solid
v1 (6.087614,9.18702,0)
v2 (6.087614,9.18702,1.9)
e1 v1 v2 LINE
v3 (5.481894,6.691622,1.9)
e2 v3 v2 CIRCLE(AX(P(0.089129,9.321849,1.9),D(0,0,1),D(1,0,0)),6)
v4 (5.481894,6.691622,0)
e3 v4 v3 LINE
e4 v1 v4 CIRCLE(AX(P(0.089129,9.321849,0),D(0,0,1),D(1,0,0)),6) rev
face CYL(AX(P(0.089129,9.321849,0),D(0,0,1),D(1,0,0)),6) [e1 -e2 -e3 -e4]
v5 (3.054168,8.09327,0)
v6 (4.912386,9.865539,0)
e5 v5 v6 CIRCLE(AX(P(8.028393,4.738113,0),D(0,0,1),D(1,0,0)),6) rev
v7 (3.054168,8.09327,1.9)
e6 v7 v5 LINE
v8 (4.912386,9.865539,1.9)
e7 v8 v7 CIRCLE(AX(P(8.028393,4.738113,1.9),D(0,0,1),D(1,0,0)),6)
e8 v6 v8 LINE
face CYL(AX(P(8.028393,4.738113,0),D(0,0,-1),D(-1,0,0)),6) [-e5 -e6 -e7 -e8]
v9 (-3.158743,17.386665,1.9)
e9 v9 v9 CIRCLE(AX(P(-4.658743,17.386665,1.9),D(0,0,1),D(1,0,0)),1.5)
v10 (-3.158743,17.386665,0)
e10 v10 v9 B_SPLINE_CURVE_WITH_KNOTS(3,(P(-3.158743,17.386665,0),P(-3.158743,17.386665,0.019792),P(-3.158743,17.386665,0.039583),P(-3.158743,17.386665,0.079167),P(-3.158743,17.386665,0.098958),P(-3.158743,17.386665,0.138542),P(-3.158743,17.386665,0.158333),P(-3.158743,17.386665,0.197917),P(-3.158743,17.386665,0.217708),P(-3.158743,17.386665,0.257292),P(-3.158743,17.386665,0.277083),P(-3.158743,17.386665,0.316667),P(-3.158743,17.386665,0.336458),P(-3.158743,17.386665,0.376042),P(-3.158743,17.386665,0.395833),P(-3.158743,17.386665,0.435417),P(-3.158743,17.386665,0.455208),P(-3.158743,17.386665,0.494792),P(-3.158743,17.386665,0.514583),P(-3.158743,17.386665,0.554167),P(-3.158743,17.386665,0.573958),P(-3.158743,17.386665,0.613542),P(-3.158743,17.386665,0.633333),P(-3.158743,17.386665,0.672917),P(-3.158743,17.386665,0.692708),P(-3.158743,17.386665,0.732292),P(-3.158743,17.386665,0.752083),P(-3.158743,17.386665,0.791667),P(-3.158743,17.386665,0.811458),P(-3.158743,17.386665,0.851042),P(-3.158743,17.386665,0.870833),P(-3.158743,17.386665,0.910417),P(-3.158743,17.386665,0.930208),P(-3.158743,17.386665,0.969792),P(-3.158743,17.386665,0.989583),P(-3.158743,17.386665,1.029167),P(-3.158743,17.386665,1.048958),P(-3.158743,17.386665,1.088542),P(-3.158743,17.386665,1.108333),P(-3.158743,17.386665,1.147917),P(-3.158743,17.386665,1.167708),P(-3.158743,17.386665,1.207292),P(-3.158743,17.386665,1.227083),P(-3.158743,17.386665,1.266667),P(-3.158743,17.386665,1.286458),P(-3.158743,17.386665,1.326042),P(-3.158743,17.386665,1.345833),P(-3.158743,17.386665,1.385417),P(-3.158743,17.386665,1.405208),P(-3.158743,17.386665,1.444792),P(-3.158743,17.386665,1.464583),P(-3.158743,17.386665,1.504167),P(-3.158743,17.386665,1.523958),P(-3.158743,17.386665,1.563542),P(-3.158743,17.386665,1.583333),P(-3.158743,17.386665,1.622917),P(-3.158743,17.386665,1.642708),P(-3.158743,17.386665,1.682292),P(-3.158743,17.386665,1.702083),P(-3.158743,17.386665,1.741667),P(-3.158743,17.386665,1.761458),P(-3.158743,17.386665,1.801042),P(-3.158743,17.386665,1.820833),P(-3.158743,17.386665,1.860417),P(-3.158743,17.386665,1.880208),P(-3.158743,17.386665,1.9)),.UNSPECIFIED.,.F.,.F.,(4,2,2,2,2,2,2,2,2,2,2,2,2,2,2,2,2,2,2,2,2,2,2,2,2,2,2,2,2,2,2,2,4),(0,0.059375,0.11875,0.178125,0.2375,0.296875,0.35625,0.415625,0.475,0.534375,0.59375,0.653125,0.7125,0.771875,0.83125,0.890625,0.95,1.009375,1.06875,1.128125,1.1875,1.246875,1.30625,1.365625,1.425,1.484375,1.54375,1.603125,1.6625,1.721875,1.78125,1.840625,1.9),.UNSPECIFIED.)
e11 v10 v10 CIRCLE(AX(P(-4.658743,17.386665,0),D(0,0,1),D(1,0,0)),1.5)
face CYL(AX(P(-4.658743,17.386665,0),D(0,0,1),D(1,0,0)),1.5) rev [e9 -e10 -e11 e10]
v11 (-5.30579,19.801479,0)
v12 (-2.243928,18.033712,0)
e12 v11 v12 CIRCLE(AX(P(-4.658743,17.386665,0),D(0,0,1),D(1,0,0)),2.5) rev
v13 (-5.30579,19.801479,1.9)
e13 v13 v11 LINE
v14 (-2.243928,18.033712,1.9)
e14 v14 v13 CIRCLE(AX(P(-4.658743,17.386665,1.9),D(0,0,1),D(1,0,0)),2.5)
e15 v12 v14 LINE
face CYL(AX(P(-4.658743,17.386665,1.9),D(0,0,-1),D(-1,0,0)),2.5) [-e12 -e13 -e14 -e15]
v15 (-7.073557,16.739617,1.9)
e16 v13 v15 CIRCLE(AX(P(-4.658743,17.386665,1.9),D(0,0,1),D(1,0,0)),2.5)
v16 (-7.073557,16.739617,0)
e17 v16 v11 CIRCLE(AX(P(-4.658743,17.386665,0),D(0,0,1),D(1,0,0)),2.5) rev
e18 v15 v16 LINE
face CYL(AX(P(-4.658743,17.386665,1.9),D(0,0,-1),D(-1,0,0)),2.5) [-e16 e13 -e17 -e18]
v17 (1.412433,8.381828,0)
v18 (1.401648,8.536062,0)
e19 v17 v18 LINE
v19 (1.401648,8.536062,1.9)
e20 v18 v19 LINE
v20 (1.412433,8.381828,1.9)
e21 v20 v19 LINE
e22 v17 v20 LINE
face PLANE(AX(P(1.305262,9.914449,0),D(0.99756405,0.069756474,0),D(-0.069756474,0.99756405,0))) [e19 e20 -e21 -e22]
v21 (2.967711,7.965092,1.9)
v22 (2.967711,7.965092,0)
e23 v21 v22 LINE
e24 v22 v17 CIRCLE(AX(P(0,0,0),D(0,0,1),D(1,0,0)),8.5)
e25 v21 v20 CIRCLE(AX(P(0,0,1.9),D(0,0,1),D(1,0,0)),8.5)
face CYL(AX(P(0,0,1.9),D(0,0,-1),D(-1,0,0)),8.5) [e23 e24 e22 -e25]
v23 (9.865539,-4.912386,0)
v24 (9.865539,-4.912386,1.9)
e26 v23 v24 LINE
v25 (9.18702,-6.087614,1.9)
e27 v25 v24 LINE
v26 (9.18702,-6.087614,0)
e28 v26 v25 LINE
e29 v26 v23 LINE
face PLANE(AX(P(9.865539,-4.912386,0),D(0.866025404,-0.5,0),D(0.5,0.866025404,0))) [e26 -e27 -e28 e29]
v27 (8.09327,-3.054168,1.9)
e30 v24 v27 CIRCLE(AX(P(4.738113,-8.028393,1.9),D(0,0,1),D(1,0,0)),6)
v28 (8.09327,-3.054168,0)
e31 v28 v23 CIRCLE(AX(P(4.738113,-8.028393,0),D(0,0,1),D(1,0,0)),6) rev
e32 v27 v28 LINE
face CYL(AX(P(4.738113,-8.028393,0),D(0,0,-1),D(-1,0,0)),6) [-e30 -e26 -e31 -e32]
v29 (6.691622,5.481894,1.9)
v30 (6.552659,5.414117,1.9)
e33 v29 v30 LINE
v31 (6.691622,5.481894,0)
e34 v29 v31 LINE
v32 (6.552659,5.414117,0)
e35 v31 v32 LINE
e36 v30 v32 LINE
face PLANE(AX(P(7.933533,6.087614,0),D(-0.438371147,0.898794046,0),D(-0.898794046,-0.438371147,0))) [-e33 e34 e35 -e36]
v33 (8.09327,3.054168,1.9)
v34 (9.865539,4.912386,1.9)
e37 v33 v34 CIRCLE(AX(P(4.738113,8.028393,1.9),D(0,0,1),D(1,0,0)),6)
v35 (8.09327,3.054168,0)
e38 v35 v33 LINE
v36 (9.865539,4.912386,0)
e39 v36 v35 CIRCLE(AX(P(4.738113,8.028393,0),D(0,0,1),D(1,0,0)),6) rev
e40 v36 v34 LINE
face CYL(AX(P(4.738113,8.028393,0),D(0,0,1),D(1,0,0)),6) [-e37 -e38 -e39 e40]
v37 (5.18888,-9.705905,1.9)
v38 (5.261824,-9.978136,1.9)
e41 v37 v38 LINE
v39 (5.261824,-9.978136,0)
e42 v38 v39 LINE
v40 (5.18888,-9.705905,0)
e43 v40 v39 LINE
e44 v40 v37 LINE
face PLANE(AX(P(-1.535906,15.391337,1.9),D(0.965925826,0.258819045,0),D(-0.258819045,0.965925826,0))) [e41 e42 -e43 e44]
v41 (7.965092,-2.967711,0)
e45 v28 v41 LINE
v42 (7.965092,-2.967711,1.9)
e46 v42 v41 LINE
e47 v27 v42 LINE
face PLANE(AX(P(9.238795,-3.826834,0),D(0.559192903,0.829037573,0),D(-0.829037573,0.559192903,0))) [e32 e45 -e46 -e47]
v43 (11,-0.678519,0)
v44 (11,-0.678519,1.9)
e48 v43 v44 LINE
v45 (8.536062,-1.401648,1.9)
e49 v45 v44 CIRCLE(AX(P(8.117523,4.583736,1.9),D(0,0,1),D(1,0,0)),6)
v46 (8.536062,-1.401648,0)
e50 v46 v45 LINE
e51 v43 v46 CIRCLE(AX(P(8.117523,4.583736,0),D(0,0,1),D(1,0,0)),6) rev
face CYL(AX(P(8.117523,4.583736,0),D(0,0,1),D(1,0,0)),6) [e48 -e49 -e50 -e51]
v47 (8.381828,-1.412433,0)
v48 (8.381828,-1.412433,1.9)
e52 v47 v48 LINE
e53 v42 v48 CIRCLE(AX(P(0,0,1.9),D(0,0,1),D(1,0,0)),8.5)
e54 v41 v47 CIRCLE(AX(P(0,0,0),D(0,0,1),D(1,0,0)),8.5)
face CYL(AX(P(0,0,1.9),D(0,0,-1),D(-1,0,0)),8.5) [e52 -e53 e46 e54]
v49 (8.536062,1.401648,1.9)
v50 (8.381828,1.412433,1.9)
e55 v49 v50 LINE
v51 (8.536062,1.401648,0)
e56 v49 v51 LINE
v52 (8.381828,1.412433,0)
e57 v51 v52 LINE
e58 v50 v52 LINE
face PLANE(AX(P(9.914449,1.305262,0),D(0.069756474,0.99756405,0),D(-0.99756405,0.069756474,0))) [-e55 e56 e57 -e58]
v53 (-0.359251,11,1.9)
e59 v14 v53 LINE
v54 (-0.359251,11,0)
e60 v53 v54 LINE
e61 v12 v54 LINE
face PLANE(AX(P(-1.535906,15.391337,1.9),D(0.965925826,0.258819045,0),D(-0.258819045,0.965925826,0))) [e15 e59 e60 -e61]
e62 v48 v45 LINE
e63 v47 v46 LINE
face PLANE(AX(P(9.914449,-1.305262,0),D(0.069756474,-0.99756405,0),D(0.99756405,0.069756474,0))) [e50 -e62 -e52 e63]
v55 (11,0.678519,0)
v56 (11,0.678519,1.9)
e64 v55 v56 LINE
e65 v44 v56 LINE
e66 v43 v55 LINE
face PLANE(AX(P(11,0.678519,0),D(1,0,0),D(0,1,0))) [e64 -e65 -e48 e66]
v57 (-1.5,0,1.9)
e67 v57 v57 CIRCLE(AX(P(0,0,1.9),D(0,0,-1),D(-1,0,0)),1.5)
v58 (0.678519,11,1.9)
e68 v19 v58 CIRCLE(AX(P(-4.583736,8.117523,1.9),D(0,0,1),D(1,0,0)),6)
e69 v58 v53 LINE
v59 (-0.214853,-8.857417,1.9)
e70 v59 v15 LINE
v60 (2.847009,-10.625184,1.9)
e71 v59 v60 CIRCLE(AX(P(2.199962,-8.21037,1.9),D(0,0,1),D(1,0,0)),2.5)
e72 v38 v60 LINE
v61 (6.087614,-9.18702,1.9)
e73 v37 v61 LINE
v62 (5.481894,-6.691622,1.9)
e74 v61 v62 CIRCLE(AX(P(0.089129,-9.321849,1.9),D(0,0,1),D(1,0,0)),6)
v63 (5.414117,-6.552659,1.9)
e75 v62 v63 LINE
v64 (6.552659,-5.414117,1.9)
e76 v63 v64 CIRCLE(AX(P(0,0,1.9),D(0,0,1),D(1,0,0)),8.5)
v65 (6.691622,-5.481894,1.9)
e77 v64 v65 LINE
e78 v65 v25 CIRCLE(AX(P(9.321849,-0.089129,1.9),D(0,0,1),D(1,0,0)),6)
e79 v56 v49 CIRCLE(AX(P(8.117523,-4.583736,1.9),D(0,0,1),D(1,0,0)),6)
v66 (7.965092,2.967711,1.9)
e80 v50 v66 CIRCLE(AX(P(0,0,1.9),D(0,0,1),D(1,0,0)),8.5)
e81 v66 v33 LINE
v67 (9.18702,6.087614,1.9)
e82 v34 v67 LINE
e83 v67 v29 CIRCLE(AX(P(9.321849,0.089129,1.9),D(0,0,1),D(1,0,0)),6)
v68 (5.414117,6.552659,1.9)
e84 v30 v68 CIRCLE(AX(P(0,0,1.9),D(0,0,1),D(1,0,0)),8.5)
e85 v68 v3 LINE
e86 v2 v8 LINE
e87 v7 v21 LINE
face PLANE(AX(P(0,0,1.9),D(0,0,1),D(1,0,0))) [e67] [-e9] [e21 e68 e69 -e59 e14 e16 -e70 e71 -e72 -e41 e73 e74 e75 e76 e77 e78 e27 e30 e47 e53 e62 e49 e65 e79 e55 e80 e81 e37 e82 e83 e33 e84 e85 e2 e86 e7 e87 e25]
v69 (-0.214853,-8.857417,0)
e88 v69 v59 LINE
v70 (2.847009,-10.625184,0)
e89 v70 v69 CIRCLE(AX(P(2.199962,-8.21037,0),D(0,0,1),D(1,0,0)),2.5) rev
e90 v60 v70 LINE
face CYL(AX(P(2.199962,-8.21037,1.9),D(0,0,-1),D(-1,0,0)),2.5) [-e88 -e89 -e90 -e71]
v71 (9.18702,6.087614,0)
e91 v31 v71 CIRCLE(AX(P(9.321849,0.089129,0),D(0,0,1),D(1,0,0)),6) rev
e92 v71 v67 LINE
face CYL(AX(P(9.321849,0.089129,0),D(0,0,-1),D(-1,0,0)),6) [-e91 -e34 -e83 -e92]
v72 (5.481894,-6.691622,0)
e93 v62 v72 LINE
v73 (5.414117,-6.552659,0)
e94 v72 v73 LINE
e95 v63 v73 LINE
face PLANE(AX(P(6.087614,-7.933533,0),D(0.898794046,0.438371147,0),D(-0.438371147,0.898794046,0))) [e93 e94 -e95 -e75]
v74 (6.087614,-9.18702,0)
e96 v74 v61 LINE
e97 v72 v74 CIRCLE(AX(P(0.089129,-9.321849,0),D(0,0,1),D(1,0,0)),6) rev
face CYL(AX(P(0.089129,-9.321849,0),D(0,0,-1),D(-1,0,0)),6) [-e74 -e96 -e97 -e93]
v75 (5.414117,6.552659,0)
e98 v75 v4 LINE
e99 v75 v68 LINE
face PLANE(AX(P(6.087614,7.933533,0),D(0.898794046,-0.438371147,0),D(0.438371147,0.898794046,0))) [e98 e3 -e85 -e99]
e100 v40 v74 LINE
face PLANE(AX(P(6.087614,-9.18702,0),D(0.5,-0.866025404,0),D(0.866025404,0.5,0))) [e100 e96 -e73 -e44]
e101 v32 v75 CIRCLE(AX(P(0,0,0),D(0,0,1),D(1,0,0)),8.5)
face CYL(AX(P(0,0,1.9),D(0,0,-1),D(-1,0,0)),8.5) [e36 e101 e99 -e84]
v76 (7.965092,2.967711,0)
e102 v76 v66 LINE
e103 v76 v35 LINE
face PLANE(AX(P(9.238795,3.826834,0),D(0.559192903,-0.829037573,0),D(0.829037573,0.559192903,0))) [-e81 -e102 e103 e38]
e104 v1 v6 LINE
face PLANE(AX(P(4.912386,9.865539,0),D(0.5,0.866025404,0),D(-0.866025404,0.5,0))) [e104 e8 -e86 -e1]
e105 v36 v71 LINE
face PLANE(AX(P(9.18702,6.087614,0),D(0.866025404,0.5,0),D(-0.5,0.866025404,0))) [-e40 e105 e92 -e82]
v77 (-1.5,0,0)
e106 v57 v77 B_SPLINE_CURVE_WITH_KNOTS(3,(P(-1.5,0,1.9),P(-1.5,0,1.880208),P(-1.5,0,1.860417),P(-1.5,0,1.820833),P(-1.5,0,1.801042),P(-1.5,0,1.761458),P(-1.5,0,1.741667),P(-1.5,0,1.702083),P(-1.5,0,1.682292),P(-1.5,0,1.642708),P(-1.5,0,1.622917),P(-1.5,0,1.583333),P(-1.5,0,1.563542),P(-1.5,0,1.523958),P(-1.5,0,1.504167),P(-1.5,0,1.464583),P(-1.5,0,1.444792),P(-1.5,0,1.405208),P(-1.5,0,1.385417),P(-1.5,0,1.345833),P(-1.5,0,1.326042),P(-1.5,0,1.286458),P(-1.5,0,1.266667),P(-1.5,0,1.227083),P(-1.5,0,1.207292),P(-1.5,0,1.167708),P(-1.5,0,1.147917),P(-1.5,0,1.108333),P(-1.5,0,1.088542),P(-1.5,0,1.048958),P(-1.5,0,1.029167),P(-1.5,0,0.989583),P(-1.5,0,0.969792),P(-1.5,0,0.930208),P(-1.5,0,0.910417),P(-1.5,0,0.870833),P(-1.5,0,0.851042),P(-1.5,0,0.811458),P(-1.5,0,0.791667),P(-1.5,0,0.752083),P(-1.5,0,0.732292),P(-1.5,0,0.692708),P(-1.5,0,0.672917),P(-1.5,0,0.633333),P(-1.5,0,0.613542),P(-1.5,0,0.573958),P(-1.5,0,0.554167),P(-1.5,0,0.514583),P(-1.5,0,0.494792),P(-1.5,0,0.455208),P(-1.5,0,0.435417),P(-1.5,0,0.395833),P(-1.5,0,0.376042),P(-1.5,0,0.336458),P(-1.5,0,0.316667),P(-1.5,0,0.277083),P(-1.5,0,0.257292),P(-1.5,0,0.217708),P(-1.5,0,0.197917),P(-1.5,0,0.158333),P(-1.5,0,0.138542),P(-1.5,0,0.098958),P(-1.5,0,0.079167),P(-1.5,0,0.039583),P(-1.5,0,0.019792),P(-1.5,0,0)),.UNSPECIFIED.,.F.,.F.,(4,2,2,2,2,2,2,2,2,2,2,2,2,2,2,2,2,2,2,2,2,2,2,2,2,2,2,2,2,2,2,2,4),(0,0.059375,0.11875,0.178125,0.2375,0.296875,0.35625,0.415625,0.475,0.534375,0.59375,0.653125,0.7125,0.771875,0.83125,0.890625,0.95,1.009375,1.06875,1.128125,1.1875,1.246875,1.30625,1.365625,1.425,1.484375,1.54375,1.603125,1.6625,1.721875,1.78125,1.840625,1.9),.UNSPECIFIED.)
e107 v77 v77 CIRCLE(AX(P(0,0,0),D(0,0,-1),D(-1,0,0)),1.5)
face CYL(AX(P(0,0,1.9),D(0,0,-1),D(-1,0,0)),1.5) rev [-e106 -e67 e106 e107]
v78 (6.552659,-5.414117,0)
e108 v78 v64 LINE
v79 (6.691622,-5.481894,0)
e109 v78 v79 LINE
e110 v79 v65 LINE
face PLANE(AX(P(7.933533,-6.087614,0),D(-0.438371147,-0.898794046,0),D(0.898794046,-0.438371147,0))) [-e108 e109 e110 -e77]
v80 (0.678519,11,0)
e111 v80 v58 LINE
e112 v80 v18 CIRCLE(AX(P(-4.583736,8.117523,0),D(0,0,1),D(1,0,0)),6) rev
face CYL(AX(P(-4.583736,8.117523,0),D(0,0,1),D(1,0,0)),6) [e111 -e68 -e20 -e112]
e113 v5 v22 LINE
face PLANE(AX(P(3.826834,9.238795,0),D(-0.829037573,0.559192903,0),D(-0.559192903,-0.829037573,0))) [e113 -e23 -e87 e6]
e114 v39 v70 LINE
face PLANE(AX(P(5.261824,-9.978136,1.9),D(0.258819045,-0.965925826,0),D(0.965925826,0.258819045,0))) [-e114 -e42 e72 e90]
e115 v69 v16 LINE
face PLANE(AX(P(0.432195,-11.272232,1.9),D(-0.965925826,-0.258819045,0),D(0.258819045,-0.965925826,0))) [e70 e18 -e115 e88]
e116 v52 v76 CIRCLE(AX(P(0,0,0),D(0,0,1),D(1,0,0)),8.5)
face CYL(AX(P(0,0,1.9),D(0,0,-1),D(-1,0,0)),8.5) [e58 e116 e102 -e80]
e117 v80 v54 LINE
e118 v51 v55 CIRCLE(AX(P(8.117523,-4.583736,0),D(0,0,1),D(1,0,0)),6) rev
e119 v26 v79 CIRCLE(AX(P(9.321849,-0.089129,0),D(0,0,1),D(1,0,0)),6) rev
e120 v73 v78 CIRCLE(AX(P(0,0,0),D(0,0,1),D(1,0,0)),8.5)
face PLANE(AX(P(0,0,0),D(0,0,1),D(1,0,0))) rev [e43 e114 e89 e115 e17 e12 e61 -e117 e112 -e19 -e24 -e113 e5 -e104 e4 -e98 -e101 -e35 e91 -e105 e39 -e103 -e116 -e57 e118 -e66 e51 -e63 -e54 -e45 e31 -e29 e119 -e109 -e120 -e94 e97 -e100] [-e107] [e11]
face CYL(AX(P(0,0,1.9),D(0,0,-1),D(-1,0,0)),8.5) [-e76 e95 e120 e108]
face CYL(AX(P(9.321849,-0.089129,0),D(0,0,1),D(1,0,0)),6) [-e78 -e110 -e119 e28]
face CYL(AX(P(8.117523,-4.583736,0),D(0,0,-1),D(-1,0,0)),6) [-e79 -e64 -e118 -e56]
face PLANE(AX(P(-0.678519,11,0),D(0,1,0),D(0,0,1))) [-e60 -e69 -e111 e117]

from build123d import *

# Parameters (mm, degrees)
SKETCH1_R           = 8.5
BOSS_EXTRUDE1_DEPTH = 1.9
BOSS_EXTRUDE2_DEPTH = 1.9
CIRPATTERN2_COUNT   = 12
FILLET5_R           = 6
FILLET6_R           = 6
BOSS_EXTRUDE5_DEPTH = 1.9
SKETCH15_R          = 5
BOSS_EXTRUDE6_DEPTH = 1.9
SKETCH14_R          = 1.5
CUT_EXTRUDE7_DEPTH  = 24.297043988
CUT_EXTRUDE8_DEPTH  = 24.297043988
SKETCH17_R          = 1.5
CUT_EXTRUDE9_DEPTH  = 24.297043988
FILLET7_R           = 2.5


# Some blends are built 0.0001 mm under size
with BuildPart() as part:
    # Sketch1 → Boss-Extrude1 (new body)
    with BuildSketch(Plane.XY):
        with Locations(Location((0, 0, 0), (0, 0, 180))):
            Circle(SKETCH1_R)
    extrude(amount=BOSS_EXTRUDE1_DEPTH)

    # Sketch3 → Boss-Extrude2 (add)
    with BuildSketch(Plane.XY.offset(1.9)):
        Polygon((-1.305261922, 9.914448614), (-1.509060022, 7), (1.509060022, 7), (1.305261922, 9.914448614), (0.678518537, 11), (-0.678518537, 11), align=None)
    boss_extrude2 = extrude(amount=-BOSS_EXTRUDE2_DEPTH)

    # CirPattern2: Boss-Extrude2 ×12 about axis
    cirpattern2_axis = Axis((0, 0, 0), (0, 0, 1))
    for i in range(1, CIRPATTERN2_COUNT):
        add(boss_extrude2.rotate(cirpattern2_axis, i * 360 / CIRPATTERN2_COUNT))

    # Fillet5
    # the kernel refuses this fillet: 6 mm, written as the material it takes off along each edge
    with BuildSketch(Plane(origin=(9.238795325, 3.826834324, 5.354382408), x_dir=(0.49999999999981276, 0.8660254037845467, 0), z_dir=(0, 0, -1)), Plane(origin=(1.305261922, 9.914448614, 5.354382408), x_dir=(-0.5000000000001841, 0.8660254037843323, 0), z_dir=(0, 0, -1)), Plane(origin=(-7.933533403, 6.08761429, 5.354382408), x_dir=(-1, 0, 0), z_dir=(0, 0, -1)), Plane(origin=(-9.914448614, 1.305261922, 5.354382408), x_dir=(-0.8660254037843321, -0.5000000000001844, 0), z_dir=(0, 0, -1)), Plane(origin=(-9.238795325, -3.826834324, 5.354382408), x_dir=(-0.49999999999981826, -0.8660254037845436, 0), z_dir=(0, 0, -1)), Plane(origin=(-6.08761429, -7.933533403, 5.354382408), x_dir=(0, -1, 0), z_dir=(0, 0, -1)), Plane(origin=(3.826834324, -9.238795325, 5.354382408), x_dir=(0.8660254037845474, -0.49999999999981154, 0), z_dir=(0, 0, -1)), Plane(origin=(7.933533403, -6.08761429, 5.354382408), x_dir=(1, 0, 0), z_dir=(0, 0, -1)), Plane(origin=(9.914448614, -1.305261922, 5.354382408), x_dir=(0.866025403784333, 0.500000000000183, 0), z_dir=(0, 0, -1))) as fillet5_piece_1:
        with BuildLine():
            CenterArc((1.388315544, -5.998484909), FILLET5_R, 91.287628333, 24.712371667)
            Line((-1.241911337, -0.605720631), (-1.294515874, -0.497865346))
            Line((-1.294515874, -0.497865346), (-0.052604538, 0.107855286))
            Line((-0.052604538, 0.107855286), (0, 0.12))
            ThreePointArc((0, 0.12), (0.626743385, 0.12), (1.250790195, 0.119969698))
            Line((1.250790195, 0.119969698), (1.25348677, 0))
        make_face()
    extrude(amount=8.808764816, mode=Mode.SUBTRACT)
    with BuildSketch(Plane(origin=(6.08761429, 7.933533403, 5.354382408), x_dir=(-0.4383711467890806, -0.8987940462991654, 0), z_dir=(0, 0, -1)), Plane(origin=(-3.826834324, 9.238795325, 5.354382408), x_dir=(0.5591929034707432, -0.8290375725550441, 0), z_dir=(0, 0, -1)), Plane(origin=(-1.305261922, -9.914448614, 5.354382408), x_dir=(-0.06975647374412203, 0.9975640502598244, 0), z_dir=(0, 0, -1))) as fillet5_piece_2:
        with BuildLine():
            CenterArc((1.381752963, 6), FILLET5_R, 245.287628333, 24.712371667)
            Line((-1.126626446, 0.549492433), (-1.176794034, 0.440482282))
            ThreePointArc((-1.176794034, 0.440482282), (-0.615917761, 0.166890931), (-0.052604538, -0.107855286))
            Line((-0.052604538, -0.107855286), (0, -0.12))
            Line((0, -0.12), (1.381752963, -0.12))
            Line((1.381752963, -0.12), (1.381752963, 0))
        make_face()
    extrude(amount=8.808764816, mode=Mode.SUBTRACT)

    # Fillet6
    # the kernel refuses this fillet: 6 mm, written as the material it takes off along each edge
    with BuildSketch(Plane(origin=(7.933533403, 6.08761429, 5.354382408), x_dir=(-0.8987940462991681, -0.4383711467890751, 0), z_dir=(0, 0, -1)), Plane(origin=(3.826834324, 9.238795325, 5.354382408), x_dir=(-0.5591929034707512, -0.8290375725550386, 0), z_dir=(0, 0, -1)), Plane(origin=(-1.305261922, 9.914448614, 5.354382408), x_dir=(-0.06975647374412959, -0.9975640502598239, 0), z_dir=(0, 0, -1)), Plane(origin=(-6.08761429, 7.933533403, 5.354382408), x_dir=(0.43837114678907496, -0.8987940462991681, 0), z_dir=(0, 0, -1)), Plane(origin=(-9.238795325, 3.826834324, 5.354382408), x_dir=(0.8290375725550395, -0.5591929034707501, 0), z_dir=(0, 0, -1)), Plane(origin=(-9.914448614, -1.305261922, 5.354382408), x_dir=(0.9975640502598241, -0.0697564737441288, 0), z_dir=(0, 0, -1)), Plane(origin=(-7.933533403, -6.08761429, 5.354382408), x_dir=(0.8987940462991686, 0.4383711467890744, 0), z_dir=(0, 0, -1)), Plane(origin=(-3.826834324, -9.238795325, 5.354382408), x_dir=(0.5591929034707488, 0.8290375725550403, 0), z_dir=(0, 0, -1)), Plane(origin=(1.305261922, -9.914448614, 5.354382408), x_dir=(0.06975647374412966, 0.9975640502598239, 0), z_dir=(0, 0, -1)), Plane(origin=(6.08761429, -7.933533403, 5.354382408), x_dir=(-0.4383711467890749, 0.8987940462991683, 0), z_dir=(0, 0, -1)), Plane(origin=(9.238795325, -3.826834324, 5.354382408), x_dir=(-0.8290375725550393, 0.5591929034707505, 0), z_dir=(0, 0, -1)), Plane(origin=(9.914448614, 1.305261922, 5.354382408), x_dir=(-0.9975640502598239, 0.06975647374412894, 0), z_dir=(0, 0, -1))) as fillet6_piece_1:
        with BuildLine():
            CenterArc((1.381752963, -6), FILLET6_R, 90, 24.712371667)
            Line((-1.126626446, -0.549492433), (-1.176794034, -0.440482282))
            ThreePointArc((-1.176794034, -0.440482282), (-0.615917761, -0.166890931), (-0.052604538, 0.107855286))
            Line((-0.052604538, 0.107855286), (0, 0.12))
            Line((0, 0.12), (1.381752963, 0.12))
            Line((1.381752963, 0.12), (1.381752963, 0))
        make_face()
    extrude(amount=8.808764816, mode=Mode.SUBTRACT)

    # Sketch12 → Boss-Extrude5 (add)
    with BuildSketch(Plane(origin=(0, 0, 0), x_dir=(-1, 0, 0), z_dir=(0, 0, -1))):
        Polygon((1.535905814, 15.391336798), (-5.261824062, -9.978136476), (-0.43219493, -11.272231702), (7.72060499, 19.154431826), (2.890975859, 20.448527052), align=None)
    extrude(amount=-BOSS_EXTRUDE5_DEPTH)

    # Sketch15 → Boss-Extrude6 (add)
    with BuildSketch(Plane(origin=(0, 0, 0), x_dir=(-1, 0, 0), z_dir=(0, 0, -1))):
        Circle(SKETCH15_R)
    extrude(amount=-BOSS_EXTRUDE6_DEPTH)

    # Sketch14 → Cut-Extrude7 (cut, through all)
    with BuildSketch(Plane(origin=(0, 0, 0), x_dir=(-1, 0, 0), z_dir=(0, 0, -1))):
        Circle(SKETCH14_R)
    extrude(amount=-CUT_EXTRUDE7_DEPTH, mode=Mode.SUBTRACT)

    # Sketch16 → Cut-Extrude8 (cut, through all)
    with BuildSketch(Plane.XY.offset(1.9)):
        Polygon((-5.659024027, 11.460506927), (0.43219493, -11.272231702), (-8.69145043, -13.716905108), (-14.782669387, 9.015833521), align=None)
    extrude(amount=-CUT_EXTRUDE8_DEPTH, mode=Mode.SUBTRACT)

    # Sketch17 → Cut-Extrude9 (cut, through all)
    with BuildSketch(Plane.XY.offset(1.9)):
        with Locations((-4.658742812, 17.386664873)):
            Circle(SKETCH17_R)
    extrude(amount=-CUT_EXTRUDE9_DEPTH, mode=Mode.SUBTRACT)

    # Fillet7
    fillet7_edges = [part.edges().sort_by_distance(p)[0] for p in [
        (-7.72060499, 19.154431826, 0.95),
        (-2.890975859, 20.448527052, 0.95),
        (0.43219493, -11.272231702, 0.95),
    ]]
    fillet(fillet7_edges, radius=FILLET7_R - 0.0001)  # a hair under: the kernel refuses the full size


solid = part.part
